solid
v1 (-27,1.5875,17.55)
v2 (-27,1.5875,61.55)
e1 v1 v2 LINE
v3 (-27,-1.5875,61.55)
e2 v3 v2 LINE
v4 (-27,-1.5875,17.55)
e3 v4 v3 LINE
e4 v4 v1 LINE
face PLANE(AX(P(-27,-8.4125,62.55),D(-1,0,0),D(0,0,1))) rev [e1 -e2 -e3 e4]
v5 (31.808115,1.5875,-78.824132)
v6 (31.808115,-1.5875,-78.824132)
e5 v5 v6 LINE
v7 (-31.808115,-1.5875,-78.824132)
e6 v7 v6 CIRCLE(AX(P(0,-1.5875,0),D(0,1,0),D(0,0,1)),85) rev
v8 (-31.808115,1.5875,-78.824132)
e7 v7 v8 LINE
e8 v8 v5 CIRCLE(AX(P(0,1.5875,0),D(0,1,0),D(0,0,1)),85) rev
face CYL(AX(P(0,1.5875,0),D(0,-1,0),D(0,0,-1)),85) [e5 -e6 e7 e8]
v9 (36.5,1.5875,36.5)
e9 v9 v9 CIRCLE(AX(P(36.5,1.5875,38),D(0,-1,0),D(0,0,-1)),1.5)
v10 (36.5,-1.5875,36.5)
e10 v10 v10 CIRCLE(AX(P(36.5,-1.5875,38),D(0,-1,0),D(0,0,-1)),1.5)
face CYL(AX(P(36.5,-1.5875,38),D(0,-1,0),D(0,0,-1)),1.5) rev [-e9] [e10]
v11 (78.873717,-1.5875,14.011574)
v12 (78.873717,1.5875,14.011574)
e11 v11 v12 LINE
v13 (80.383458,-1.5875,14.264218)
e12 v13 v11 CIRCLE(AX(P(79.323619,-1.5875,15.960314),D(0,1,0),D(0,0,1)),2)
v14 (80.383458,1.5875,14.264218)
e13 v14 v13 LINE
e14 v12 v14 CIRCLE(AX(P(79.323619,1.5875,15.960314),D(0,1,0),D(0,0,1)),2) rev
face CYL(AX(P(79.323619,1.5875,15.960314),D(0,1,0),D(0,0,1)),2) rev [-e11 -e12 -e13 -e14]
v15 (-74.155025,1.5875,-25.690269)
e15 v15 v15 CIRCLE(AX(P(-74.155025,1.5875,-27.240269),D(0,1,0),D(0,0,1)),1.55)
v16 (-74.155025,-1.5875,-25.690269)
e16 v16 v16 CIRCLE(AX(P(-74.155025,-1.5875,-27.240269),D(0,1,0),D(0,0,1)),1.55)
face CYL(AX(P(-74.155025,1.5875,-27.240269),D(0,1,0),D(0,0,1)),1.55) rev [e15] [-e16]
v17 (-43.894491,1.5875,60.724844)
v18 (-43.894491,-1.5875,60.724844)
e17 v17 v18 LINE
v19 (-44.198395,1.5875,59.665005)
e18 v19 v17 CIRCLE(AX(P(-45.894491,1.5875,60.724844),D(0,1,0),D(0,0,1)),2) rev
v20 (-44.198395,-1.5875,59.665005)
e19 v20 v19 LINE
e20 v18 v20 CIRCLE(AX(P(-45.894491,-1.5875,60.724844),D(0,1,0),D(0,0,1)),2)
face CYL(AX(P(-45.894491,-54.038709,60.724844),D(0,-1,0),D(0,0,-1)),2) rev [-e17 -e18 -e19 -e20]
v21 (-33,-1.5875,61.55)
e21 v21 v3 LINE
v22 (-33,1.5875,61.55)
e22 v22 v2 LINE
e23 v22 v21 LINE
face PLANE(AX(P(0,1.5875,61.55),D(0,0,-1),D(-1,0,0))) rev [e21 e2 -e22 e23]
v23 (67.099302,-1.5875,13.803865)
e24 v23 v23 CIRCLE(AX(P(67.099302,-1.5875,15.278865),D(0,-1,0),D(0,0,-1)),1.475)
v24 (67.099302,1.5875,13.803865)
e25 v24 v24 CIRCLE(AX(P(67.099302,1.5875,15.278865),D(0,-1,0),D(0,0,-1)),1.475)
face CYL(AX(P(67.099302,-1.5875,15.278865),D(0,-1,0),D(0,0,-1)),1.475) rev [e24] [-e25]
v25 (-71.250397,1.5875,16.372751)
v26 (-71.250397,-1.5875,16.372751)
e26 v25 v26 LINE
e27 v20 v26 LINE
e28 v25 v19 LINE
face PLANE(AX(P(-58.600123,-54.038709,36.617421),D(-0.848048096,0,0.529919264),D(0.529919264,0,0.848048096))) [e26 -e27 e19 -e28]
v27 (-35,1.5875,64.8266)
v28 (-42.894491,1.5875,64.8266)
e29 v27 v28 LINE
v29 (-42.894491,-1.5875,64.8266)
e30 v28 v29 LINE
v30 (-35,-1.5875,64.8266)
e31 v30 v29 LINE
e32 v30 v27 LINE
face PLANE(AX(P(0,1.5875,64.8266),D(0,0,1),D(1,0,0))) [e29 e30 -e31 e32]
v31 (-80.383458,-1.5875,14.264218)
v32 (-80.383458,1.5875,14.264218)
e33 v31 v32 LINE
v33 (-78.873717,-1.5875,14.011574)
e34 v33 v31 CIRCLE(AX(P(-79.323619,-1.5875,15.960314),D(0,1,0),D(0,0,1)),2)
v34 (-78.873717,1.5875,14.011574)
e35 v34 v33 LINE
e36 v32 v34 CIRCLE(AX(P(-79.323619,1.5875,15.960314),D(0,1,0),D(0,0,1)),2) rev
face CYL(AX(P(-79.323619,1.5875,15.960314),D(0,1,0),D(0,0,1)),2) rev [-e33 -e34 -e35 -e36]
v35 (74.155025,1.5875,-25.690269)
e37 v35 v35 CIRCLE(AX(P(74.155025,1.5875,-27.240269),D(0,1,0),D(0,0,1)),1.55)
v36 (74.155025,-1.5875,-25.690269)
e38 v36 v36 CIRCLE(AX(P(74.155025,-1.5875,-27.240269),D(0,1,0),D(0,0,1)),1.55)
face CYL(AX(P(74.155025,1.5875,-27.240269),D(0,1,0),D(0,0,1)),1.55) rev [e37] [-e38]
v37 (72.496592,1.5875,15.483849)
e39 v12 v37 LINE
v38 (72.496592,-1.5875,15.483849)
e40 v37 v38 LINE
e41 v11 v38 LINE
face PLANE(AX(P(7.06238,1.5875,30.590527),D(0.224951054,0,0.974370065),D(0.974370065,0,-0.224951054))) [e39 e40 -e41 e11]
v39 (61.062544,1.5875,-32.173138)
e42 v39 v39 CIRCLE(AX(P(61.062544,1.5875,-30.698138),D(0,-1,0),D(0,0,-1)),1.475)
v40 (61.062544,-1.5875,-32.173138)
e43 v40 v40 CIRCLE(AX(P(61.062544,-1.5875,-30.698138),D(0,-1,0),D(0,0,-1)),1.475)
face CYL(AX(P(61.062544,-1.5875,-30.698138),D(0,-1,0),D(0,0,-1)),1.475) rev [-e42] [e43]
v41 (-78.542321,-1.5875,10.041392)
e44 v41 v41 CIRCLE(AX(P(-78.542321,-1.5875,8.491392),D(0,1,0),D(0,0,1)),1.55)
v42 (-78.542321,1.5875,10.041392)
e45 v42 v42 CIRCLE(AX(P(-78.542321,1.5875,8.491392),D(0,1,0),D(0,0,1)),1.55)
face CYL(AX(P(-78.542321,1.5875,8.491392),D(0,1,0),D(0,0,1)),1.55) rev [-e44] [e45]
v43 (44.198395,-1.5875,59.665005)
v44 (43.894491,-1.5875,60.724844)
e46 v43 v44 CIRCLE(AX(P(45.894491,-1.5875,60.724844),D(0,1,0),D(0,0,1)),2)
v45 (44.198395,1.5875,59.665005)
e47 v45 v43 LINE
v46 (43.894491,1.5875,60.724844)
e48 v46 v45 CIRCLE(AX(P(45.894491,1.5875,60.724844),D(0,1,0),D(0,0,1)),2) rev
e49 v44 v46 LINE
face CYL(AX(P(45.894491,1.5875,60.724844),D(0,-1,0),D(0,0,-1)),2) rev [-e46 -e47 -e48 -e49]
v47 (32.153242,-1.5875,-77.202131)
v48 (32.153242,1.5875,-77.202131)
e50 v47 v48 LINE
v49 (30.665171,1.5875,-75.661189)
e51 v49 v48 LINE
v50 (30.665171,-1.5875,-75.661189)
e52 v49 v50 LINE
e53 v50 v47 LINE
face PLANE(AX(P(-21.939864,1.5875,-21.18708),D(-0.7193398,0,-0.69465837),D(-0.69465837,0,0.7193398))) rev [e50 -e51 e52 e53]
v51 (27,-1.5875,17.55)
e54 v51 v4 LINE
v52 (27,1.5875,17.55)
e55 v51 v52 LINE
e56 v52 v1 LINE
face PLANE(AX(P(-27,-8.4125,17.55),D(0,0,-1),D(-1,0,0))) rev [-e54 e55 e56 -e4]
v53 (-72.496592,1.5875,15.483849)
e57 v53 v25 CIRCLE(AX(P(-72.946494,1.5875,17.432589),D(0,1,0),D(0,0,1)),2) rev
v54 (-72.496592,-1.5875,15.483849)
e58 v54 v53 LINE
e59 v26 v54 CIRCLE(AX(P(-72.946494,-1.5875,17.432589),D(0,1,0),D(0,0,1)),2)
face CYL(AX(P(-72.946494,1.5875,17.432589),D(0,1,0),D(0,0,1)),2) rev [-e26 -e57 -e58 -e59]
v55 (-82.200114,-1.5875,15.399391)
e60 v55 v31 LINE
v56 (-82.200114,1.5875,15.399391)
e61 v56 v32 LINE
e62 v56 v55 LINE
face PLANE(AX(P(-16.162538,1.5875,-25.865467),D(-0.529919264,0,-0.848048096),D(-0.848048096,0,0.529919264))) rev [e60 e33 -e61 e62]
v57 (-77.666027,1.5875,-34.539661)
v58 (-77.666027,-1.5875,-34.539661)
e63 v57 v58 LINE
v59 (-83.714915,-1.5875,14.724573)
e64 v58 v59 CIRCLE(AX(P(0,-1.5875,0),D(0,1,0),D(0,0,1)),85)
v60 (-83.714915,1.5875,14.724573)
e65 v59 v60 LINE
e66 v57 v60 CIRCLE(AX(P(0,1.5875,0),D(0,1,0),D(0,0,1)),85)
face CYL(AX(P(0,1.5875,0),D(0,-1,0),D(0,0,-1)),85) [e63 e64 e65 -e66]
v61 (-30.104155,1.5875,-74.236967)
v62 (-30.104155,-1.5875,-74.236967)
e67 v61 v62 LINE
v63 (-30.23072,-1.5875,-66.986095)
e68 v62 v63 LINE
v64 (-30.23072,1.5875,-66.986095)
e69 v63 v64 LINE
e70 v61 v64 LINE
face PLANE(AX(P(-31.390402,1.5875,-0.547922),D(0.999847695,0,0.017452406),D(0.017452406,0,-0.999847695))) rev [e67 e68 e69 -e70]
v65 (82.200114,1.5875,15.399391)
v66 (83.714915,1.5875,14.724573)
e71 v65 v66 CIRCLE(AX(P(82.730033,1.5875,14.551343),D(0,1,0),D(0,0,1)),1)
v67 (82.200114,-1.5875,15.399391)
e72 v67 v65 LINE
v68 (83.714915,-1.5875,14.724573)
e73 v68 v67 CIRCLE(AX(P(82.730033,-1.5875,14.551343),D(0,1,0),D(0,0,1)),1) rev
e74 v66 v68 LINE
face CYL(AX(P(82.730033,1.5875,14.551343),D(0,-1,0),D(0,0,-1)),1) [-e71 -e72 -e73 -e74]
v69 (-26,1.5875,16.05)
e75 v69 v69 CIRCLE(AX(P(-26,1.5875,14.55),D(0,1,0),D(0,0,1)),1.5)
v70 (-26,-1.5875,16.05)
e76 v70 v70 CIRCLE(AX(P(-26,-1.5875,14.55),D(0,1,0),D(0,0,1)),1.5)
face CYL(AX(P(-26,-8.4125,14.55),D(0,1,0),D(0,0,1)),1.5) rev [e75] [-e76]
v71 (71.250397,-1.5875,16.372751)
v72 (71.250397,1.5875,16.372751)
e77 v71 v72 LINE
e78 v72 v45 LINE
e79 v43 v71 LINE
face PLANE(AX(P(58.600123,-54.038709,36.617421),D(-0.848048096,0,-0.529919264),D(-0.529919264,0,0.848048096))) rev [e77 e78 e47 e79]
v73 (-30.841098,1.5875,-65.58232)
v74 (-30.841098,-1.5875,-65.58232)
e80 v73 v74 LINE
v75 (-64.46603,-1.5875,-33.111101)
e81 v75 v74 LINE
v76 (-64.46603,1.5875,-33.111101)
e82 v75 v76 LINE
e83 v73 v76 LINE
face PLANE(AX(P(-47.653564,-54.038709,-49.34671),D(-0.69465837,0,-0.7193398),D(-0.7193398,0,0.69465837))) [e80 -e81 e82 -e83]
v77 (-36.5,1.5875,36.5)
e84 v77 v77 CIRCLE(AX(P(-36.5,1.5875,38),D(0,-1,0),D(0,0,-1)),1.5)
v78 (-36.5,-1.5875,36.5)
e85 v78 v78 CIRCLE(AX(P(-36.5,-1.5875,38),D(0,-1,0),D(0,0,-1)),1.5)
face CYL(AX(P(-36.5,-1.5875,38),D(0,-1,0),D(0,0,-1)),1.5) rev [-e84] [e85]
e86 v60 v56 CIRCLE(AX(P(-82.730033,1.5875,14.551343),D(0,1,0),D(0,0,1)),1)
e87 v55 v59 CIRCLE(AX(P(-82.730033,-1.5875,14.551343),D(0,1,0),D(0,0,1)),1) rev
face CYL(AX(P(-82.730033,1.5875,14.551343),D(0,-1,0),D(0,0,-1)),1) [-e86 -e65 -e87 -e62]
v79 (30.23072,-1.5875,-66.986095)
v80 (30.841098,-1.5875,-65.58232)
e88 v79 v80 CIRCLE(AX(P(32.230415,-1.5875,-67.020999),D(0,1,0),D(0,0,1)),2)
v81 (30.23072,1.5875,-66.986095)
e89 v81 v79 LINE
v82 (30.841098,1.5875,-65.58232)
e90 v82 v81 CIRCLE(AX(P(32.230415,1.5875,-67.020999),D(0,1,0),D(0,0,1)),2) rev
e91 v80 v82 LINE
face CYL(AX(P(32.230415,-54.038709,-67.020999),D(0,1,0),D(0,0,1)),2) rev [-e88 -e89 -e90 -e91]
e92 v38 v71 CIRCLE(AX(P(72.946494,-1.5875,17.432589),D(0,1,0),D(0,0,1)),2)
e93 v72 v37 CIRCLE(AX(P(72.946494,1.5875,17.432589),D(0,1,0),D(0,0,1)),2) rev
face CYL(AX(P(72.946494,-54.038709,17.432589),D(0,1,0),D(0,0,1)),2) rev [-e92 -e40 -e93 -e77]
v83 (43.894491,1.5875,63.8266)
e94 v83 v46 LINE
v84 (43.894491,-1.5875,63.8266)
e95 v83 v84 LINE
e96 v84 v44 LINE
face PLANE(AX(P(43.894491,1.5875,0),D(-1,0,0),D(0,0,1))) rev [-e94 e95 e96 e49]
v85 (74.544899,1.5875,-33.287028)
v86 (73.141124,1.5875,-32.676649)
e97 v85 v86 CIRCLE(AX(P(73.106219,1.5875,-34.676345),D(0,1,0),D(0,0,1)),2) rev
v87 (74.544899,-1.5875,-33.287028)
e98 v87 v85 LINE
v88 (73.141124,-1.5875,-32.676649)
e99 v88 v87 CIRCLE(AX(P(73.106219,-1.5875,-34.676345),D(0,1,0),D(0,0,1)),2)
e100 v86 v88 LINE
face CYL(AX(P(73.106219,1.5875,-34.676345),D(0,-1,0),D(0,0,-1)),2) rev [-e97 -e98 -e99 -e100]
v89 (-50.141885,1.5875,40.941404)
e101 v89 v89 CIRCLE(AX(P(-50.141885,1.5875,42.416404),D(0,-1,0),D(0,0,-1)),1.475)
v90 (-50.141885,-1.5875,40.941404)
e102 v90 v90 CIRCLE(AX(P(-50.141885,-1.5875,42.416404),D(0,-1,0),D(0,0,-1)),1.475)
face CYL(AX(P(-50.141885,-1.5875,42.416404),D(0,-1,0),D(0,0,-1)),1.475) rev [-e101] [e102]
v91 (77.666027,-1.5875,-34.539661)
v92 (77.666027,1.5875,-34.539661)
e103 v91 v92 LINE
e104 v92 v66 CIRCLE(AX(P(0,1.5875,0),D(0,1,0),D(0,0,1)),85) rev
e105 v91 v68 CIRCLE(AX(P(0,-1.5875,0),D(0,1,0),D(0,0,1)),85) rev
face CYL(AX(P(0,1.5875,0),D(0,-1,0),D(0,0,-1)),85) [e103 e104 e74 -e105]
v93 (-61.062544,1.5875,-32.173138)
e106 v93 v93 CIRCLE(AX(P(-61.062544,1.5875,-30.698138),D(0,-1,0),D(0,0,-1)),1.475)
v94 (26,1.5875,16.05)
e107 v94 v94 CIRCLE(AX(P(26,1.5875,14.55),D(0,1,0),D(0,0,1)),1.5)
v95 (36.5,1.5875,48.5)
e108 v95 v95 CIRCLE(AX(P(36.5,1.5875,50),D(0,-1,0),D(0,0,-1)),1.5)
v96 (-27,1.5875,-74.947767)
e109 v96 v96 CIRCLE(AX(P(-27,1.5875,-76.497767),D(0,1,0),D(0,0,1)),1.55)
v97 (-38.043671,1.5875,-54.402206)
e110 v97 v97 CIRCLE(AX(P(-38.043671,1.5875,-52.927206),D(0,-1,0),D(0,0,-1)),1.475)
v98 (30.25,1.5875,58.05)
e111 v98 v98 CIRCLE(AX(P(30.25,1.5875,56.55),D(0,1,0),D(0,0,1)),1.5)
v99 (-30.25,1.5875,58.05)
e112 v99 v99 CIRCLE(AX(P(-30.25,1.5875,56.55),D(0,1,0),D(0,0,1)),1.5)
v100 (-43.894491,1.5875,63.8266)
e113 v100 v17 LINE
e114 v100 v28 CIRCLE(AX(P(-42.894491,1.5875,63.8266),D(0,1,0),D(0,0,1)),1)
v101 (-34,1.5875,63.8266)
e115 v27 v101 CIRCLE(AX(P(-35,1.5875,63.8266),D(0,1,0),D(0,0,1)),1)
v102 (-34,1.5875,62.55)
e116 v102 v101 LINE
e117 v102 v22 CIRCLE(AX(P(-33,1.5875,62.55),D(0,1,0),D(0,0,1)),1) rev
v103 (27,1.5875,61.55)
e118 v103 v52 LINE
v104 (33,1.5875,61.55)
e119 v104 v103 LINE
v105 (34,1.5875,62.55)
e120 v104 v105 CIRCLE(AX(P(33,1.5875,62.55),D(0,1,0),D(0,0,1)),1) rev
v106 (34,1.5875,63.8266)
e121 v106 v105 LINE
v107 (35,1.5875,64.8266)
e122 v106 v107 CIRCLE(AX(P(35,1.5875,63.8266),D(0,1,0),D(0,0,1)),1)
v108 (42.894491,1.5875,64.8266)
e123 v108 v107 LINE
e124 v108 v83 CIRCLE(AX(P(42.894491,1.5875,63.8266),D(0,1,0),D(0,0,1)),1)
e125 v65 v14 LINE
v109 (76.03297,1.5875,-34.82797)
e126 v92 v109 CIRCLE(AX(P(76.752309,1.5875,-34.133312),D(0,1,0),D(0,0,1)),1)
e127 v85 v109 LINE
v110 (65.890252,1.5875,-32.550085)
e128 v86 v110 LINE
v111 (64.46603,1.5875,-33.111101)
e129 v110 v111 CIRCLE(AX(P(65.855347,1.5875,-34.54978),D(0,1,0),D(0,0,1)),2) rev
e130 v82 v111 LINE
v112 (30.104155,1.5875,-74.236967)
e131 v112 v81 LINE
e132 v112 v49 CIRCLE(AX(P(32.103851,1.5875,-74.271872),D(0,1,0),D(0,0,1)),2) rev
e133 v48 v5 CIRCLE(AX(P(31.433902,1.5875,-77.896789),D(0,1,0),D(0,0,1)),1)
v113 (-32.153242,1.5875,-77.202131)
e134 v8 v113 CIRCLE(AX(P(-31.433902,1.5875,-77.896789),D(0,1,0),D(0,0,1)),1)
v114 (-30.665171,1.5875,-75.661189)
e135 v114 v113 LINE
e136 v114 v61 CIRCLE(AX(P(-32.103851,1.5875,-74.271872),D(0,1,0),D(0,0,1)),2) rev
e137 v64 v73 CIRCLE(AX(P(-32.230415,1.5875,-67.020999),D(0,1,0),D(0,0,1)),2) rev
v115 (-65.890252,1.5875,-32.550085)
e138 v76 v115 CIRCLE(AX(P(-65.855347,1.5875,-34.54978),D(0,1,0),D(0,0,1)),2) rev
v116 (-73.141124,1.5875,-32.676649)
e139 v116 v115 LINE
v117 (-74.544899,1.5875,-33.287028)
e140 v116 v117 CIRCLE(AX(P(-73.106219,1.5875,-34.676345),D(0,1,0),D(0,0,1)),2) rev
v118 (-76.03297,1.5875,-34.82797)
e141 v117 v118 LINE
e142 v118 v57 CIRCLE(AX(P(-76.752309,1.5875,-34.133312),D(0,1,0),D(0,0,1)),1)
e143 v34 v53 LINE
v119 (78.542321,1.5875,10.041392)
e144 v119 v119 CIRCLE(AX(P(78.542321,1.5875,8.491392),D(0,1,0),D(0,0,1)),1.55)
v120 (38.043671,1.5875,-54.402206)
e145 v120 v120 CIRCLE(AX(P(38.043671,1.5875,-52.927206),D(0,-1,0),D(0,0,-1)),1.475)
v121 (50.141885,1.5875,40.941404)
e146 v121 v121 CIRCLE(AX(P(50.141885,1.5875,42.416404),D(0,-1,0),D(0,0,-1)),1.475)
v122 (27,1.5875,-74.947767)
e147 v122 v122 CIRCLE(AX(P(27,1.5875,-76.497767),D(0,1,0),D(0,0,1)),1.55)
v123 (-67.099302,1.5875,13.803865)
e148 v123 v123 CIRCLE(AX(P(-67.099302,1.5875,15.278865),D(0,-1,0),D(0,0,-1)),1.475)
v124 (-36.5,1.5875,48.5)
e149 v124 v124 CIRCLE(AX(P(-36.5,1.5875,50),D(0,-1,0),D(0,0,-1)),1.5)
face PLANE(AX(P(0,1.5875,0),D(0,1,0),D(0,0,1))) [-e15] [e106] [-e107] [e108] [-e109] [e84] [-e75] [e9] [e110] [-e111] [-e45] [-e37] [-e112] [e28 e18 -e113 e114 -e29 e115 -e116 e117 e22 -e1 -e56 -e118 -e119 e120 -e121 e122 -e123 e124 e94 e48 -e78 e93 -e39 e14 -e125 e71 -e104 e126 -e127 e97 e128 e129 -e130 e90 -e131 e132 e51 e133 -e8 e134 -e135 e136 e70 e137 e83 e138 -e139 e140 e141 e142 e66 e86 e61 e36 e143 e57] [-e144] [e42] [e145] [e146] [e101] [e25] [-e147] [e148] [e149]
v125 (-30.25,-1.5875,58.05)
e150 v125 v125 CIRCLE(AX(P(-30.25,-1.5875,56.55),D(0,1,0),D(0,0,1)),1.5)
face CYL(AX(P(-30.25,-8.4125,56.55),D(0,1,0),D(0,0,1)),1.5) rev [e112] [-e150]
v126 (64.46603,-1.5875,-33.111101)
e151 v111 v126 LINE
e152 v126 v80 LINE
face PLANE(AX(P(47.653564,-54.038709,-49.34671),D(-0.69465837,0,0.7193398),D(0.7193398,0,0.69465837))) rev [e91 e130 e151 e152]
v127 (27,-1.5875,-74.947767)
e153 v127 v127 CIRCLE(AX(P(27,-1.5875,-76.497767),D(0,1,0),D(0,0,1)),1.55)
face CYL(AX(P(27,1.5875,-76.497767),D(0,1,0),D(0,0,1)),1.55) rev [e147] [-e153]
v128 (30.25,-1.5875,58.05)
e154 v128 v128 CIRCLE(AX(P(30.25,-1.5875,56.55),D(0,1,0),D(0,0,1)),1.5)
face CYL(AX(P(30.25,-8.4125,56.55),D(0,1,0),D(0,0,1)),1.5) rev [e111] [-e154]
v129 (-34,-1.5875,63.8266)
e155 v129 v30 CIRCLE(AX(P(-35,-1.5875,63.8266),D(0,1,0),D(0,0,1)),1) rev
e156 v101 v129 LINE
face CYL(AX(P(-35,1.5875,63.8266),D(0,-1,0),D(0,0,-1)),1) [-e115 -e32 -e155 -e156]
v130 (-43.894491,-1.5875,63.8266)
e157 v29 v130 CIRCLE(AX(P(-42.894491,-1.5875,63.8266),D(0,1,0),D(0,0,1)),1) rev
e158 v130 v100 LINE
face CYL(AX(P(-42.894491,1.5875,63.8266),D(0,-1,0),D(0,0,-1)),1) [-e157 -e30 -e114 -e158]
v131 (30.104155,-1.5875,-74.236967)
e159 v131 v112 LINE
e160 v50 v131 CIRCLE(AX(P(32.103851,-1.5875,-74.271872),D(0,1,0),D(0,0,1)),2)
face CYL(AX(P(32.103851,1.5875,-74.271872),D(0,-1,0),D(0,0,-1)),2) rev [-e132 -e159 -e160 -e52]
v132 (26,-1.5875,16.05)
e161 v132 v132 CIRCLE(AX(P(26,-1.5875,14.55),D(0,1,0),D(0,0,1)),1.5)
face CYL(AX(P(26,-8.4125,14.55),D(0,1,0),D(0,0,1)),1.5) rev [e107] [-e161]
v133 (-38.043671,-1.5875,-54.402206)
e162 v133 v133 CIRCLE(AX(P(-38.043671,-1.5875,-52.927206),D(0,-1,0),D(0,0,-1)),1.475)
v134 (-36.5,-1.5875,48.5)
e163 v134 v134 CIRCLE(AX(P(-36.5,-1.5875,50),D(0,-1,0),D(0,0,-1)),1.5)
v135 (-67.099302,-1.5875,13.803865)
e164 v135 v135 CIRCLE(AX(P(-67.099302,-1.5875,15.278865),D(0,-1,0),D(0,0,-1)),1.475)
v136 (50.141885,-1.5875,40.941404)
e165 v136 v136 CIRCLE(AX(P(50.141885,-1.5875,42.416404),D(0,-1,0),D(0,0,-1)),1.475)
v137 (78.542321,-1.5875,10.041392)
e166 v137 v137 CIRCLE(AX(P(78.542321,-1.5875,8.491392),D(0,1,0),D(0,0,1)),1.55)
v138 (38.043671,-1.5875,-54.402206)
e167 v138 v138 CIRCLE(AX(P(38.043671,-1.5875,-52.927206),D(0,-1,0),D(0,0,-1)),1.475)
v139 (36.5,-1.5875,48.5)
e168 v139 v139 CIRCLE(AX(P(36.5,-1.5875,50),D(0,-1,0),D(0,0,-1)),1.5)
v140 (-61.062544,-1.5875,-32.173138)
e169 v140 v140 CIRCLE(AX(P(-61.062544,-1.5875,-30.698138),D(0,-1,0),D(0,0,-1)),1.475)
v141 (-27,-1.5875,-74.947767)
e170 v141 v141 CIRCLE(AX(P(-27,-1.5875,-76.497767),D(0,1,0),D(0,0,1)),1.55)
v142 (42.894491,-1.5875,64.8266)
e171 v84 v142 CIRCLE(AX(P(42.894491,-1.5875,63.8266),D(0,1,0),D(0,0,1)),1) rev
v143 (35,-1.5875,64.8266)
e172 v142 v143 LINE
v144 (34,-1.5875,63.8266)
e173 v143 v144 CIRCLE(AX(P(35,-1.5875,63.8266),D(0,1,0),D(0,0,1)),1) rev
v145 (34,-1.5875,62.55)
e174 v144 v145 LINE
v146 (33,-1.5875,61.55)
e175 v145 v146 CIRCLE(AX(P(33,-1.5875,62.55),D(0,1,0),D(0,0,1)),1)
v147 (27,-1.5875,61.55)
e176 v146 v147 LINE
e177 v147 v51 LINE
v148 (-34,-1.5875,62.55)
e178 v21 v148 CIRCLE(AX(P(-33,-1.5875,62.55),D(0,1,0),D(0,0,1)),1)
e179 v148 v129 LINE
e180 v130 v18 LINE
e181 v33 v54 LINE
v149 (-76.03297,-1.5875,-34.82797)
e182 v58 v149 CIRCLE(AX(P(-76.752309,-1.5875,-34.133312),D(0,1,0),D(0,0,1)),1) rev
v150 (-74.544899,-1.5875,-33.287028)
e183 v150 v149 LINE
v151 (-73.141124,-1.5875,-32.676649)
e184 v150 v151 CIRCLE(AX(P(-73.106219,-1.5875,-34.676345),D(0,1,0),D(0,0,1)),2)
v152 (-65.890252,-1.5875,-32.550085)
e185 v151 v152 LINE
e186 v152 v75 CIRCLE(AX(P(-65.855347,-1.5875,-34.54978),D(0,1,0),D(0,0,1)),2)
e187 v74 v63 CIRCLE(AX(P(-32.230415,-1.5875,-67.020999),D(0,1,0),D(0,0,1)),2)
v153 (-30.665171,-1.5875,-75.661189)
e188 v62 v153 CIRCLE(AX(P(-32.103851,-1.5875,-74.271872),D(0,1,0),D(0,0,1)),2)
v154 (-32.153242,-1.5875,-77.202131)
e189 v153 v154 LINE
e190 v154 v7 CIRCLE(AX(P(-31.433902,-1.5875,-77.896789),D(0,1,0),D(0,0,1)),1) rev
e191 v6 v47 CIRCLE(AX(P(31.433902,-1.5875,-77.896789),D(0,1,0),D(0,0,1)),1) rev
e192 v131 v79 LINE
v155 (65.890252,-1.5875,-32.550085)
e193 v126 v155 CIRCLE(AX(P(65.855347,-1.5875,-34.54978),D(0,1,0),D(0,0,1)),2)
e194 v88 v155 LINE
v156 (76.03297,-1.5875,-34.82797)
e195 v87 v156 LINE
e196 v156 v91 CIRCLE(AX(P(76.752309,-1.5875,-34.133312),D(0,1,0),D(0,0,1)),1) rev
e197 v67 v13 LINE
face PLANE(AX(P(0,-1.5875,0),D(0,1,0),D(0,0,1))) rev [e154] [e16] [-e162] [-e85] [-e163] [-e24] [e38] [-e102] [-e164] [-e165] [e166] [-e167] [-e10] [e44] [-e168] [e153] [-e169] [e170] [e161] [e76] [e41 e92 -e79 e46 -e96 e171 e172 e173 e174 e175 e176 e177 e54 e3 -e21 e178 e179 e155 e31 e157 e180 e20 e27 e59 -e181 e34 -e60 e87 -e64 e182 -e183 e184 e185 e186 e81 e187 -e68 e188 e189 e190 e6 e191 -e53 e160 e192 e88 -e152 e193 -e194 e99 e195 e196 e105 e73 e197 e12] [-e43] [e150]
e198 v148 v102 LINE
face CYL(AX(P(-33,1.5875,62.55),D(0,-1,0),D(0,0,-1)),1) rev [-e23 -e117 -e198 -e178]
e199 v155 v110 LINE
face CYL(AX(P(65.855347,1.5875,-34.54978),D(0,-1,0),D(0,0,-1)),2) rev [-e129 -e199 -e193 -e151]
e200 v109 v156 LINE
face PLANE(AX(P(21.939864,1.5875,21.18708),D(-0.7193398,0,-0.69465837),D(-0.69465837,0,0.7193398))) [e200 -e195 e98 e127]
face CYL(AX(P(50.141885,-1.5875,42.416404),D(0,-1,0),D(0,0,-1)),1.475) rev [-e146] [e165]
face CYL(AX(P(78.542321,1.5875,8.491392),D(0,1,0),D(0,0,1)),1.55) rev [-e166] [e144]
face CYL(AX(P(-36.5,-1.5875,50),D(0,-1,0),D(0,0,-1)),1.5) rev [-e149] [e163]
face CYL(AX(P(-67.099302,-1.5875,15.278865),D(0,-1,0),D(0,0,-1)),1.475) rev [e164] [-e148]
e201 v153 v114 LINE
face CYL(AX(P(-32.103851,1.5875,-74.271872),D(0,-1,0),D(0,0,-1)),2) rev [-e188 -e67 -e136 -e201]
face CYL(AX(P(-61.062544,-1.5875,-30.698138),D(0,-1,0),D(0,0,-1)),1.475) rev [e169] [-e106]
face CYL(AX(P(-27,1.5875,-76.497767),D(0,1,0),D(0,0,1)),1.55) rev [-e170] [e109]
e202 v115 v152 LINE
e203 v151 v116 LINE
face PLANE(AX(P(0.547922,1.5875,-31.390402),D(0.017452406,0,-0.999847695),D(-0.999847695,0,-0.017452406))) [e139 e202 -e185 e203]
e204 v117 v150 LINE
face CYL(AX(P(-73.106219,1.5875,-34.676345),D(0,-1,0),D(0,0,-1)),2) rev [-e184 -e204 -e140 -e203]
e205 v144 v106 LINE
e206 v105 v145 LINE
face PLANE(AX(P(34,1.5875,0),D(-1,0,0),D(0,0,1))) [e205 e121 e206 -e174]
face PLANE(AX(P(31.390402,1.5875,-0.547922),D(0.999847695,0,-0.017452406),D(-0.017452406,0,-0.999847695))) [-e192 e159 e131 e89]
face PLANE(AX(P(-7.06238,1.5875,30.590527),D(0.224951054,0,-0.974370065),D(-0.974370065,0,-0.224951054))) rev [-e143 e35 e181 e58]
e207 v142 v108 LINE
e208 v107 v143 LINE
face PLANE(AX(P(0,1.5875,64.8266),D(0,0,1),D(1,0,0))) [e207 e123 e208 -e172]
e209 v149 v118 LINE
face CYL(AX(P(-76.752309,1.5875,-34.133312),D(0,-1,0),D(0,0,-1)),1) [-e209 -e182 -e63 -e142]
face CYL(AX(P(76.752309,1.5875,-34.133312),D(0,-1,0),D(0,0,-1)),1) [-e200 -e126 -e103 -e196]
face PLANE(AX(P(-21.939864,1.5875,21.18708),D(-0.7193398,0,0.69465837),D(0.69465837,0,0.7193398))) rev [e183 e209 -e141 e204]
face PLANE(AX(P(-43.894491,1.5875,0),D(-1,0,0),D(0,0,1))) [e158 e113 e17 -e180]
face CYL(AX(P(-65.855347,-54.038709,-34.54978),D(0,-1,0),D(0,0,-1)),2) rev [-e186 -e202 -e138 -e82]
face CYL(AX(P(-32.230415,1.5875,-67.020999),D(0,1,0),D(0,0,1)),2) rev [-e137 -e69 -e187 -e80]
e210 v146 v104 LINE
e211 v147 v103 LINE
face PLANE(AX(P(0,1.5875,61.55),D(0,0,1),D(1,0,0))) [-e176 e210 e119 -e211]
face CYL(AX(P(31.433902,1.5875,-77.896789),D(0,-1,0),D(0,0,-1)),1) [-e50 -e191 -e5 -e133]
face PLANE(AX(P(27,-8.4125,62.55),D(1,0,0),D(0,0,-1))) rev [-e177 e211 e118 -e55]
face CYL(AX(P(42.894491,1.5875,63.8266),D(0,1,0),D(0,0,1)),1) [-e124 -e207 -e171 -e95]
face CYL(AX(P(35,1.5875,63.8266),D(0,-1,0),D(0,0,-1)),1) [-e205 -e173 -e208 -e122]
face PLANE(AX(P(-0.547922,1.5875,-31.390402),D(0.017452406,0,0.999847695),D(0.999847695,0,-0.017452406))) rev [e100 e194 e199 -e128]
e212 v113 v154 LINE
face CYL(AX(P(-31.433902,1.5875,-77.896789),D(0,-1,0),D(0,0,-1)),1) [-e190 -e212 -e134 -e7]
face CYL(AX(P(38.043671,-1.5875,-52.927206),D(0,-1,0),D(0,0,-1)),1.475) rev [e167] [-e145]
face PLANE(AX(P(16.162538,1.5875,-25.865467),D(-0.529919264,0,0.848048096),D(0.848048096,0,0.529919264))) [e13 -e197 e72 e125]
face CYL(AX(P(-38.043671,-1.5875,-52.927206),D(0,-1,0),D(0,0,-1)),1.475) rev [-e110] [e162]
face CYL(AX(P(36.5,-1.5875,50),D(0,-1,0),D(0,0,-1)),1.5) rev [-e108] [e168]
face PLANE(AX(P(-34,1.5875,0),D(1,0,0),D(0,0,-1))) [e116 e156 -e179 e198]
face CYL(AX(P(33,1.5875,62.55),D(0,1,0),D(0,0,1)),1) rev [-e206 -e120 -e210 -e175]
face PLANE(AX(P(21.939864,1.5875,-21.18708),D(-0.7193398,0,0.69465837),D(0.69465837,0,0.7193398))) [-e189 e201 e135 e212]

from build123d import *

# Parameters (mm, degrees)
BOSS_EXTRUDE4_DEPTH  = 1.5875
M3_CLEARANCE_HOLE3_D = 3
M3_CLEARANCE_HOLE1_D = 3.1
M3_CLEARANCE_HOLE4_D = 2.95
M3_CLEARANCE_HOLE2_D = 3.1
BOSS_EXTRUDE6_DEPTH  = 3.175
FILLET1_R            = 2
FILLET3_R            = 1
FILLET6_R            = 0.5
SKETCH28_W           = 54
SKETCH28_H           = 45
CUT_EXTRUDE4_DEPTH   = 10
CUT_EXTRUDE5_DEPTH   = 10
SKETCH31_R           = 1.5
CUT_EXTRUDE7_DEPTH   = 10


with BuildPart() as part:
    # Sketch1 → Boss-Extrude4 (new, symmetric)
    with BuildSketch(Plane(origin=(0, 0, 0), x_dir=(1, 0, 0), z_dir=(0, 1, 0))):
        with BuildLine():
            Line((-62.799553621, 32.496136604), (-73.969425011, 32.691107434))
            Line((-73.969425011, 32.691107434), (-77.053684287, 35.88495141))
            ThreePointArc((-77.053684287, 35.88495141), (-84.36642289, 10.358894189), (-83.446216027, -16.178041625))
            Line((-83.446216027, -16.178041625), (-79.680911643, -13.825218315))
            Line((-79.680911643, -13.825218315), (-69.484649137, -16.179210996))
            Line((-69.484649137, -16.179210996), (-43.894490772, -57.132025032))
            Line((-43.894490772, -57.132025032), (-43.894490772, -64.826600275))
            Line((-43.894490772, -64.826600275), (-43.094490772, -64.826600275))
            Line((-43.094490772, -64.826600275), (-34, -64.826600275))
            Line((-34, -64.826600275), (-34, -62.55))
            Line((-34, -62.55), (-34, -61.55))
            Line((-34, -61.55), (-20, -61.55))
            Line((-20, -61.55), (-19.859459165, -62.55))
            Line((-19.859459165, -62.55), (19.859459165, -62.55))
            Line((19.859459165, -62.55), (20, -61.55))
            Line((20, -61.55), (34, -61.55))
            Line((34, -61.55), (34, -62.55))
            Line((34, -62.55), (34, -64.826600275))
            Line((34, -64.826600275), (43.094490772, -64.826600275))
            Line((43.094490772, -64.826600275), (43.894490772, -64.826600275))
            Line((43.894490772, -64.826600275), (43.894490772, -57.132025032))
            Line((43.894490772, -57.132025032), (69.484649137, -16.179210996))
            Line((69.484649137, -16.179210996), (79.680911643, -13.825218315))
            Line((79.680911643, -13.825218315), (83.446216027, -16.178041625))
            ThreePointArc((83.446216027, -16.178041625), (84.610662337, -8.126242604), (85, 0))
            ThreePointArc((85, 0), (82.98964744, 18.377116688), (77.053684287, 35.88495141))
            Line((77.053684287, 35.88495141), (73.969425011, 32.691107434))
            Line((73.969425011, 32.691107434), (62.799553621, 32.496136604))
            Line((62.799553621, 32.496136604), (30.284668021, 63.895396642))
            Line((30.284668021, 63.895396642), (30.089697191, 75.065268032))
            Line((30.089697191, 75.065268032), (33.173956467, 78.259112008))
            ThreePointArc((33.173956467, 78.259112008), (0, 85), (-33.173956467, 78.259112008))
            Line((-33.173956467, 78.259112008), (-30.089697191, 75.065268032))
            Line((-30.089697191, 75.065268032), (-30.284668021, 63.895396642))
            Line((-30.284668021, 63.895396642), (-62.799553621, 32.496136604))
        make_face()
    extrude(amount=BOSS_EXTRUDE4_DEPTH, both=True)

    # M3 Clearance Hole3 (through all)
    with Locations(Plane(origin=(0, -1.5875, 0), x_dir=(-1, 0, 0), z_dir=(0, -1, 0))):
        with Locations((36.5, -50), (36.5, -38), (-36.5, -50), (-36.5, -38)):
            Hole(M3_CLEARANCE_HOLE3_D / 2)

    # M3 Clearance Hole1 (through all)
    with Locations(Plane(origin=(0, 1.5875, 0), x_dir=(1, 0, 0), z_dir=(0, 1, 0))):
        with Locations((-78.542321426, -8.49139241), (78.542321426, -8.49139241), (74.155025063, 27.240269049), (-74.155025063, 27.240269049)):
            Hole(M3_CLEARANCE_HOLE1_D / 2)

    # M3 Clearance Hole4 (through all)
    with Locations(Plane(origin=(0, -1.5875, 0), x_dir=(-1, 0, 0), z_dir=(0, -1, 0))):
        with Locations((-67.099301622, -15.278865202), (-50.141885166, -42.416404279), (-61.062544382, 30.698137949), (-38.043670771, 52.927205804), (50.141885166, -42.416404279), (67.099301622, -15.278865202), (38.043670771, 52.927205804), (61.062544382, 30.698137949)):
            Hole(M3_CLEARANCE_HOLE4_D / 2)

    # M3 Clearance Hole2 (through all)
    with Locations(Plane(origin=(0, 1.5875, 0), x_dir=(1, 0, 0), z_dir=(0, 1, 0))):
        with Locations((27, 76.497766718), (-27, 76.497766718)):
            Hole(M3_CLEARANCE_HOLE2_D / 2)

    # Sketch22 → Boss-Extrude6 (add)
    with BuildSketch(Plane(origin=(0, 1.5875, 0), x_dir=(1, 0, 0), z_dir=(0, 1, 0))):
        Polygon((65.061950694, 32.535626892), (30.245177733, 66.157793715), (30.284668021, 63.895396642), (62.799553621, 32.496136604), align=None)
        Polygon((-30.284668021, 63.895396642), (-30.245177733, 66.157793715), (-65.061950694, 32.535626892), (-62.799553621, 32.496136604), align=None)
        Polygon((43.894490772, -60.151352895), (71.689396914, -15.670204865), (69.484649137, -16.179210996), (43.894490772, -57.132025032), align=None)
        Polygon((-69.484649137, -16.179210996), (-71.689396914, -15.670204865), (-43.894490772, -60.151352895), (-43.894490772, -57.132025032), align=None)
    extrude(amount=-BOSS_EXTRUDE6_DEPTH)

    # Fillet1
    fillet1_edges = [part.edges().sort_by_distance(p)[0] for p in [
        (-30.245177733, 0.79375, -66.157793715),
        (-65.061950694, 0.79375, -32.535626892),
        (-71.689396914, 0.79375, 15.670204865),
        (-43.894490772, 0.79375, 60.151352895),
        (43.894490772, -0.79375, 60.151352895),
        (71.689396914, -0.79375, 15.670204865),
        (65.061950694, 0.79375, -32.535626892),
        (30.245177733, -0.79375, -66.157793715),
        (30.089697191, -0.79375, -75.065268032),
        (73.969425011, -0.79375, -32.691107434),
        (79.680911643, -0.79375, 13.825218315),
        (-79.680911643, -0.79375, 13.825218315),
        (-73.969425011, -0.79375, -32.691107434),
        (-30.089697191, -0.79375, -75.065268032),
    ]]
    fillet(fillet1_edges, radius=FILLET1_R)

    # Fillet3
    fillet3_edges = [part.edges().sort_by_distance(p)[0] for p in [
        (33.173956467, -0.79375, -78.259112008),
        (77.053684287, 0.79375, -35.88495141),
        (83.446216027, -0.79375, 16.178041625),
        (43.894490772, -0.79375, 64.826600275),
        (34, 0.79375, 64.826600275),
        (34, -0.79375, 61.55),
        (-34, -0.79375, 61.55),
        (-34, 0.79375, 64.826600275),
        (-43.894490772, -0.79375, 64.826600275),
        (-83.446216027, -0.79375, 16.178041625),
        (-77.053684287, -0.79375, -35.88495141),
        (-33.173956467, -0.79375, -78.259112008),
    ]]
    fillet(fillet3_edges, radius=FILLET3_R - 0.0001)  # a hair under: the kernel refuses the full size

    # Fillet6
    fillet6_edges = [part.edges().sort_by_distance(p)[0] for p in [
        (20, -0.79375, 61.55),
        (19.859459165, -0.79375, 62.55),
        (-19.859459165, 0.79375, 62.55),
        (-20, 0.79375, 61.55),
    ]]
    fillet(fillet6_edges, radius=FILLET6_R)

    # Sketch28 → Cut-Extrude4 (cut)
    with BuildSketch(Plane(origin=(0, 1.5875, 0), x_dir=(1, 0, 0), z_dir=(0, 1, 0))):
        with Locations((0, -40.05)):
            Rectangle(SKETCH28_W, SKETCH28_H)
    extrude(amount=-CUT_EXTRUDE4_DEPTH, mode=Mode.SUBTRACT)

    # Sketch29 → Cut-Extrude5 (cut)
    with BuildSketch(Plane(origin=(0, 1.5875, 0), x_dir=(1, 0, 0), z_dir=(0, 1, 0))):
        with BuildLine():
            ThreePointArc((-31.75, -56.55), (-30.25, -58.05), (-28.75, -56.55))
            Line((-28.75, -56.55), (-30.25, -56.55))
            Line((-30.25, -56.55), (-31.75, -56.55))
        make_face()
        with BuildLine():
            Line((-30.25, -56.55), (-28.75, -56.55))
            ThreePointArc((-28.75, -56.55), (-30.25, -55.05), (-31.75, -56.55))
            Line((-31.75, -56.55), (-30.25, -56.55))
        make_face()
        with BuildLine():
            ThreePointArc((28.75, -56.55), (30.25, -58.05), (31.75, -56.55))
            ThreePointArc((31.75, -56.55), (30.25, -55.05), (28.75, -56.55))
        make_face()
    extrude(amount=-CUT_EXTRUDE5_DEPTH, mode=Mode.SUBTRACT)

    # Sketch31 → Cut-Extrude7 (cut)
    with BuildSketch(Plane(origin=(0, 1.5875, 0), x_dir=(1, 0, 0), z_dir=(0, 1, 0))):
        with Locations(Location((-26, -14.55, 0), (0, 0, 270))):
            Circle(SKETCH31_R)
        with Locations(Location((26, -14.55, 0), (0, 0, 270))):
            Circle(SKETCH31_R)
    extrude(amount=-CUT_EXTRUDE7_DEPTH, mode=Mode.SUBTRACT)


solid = part.part
